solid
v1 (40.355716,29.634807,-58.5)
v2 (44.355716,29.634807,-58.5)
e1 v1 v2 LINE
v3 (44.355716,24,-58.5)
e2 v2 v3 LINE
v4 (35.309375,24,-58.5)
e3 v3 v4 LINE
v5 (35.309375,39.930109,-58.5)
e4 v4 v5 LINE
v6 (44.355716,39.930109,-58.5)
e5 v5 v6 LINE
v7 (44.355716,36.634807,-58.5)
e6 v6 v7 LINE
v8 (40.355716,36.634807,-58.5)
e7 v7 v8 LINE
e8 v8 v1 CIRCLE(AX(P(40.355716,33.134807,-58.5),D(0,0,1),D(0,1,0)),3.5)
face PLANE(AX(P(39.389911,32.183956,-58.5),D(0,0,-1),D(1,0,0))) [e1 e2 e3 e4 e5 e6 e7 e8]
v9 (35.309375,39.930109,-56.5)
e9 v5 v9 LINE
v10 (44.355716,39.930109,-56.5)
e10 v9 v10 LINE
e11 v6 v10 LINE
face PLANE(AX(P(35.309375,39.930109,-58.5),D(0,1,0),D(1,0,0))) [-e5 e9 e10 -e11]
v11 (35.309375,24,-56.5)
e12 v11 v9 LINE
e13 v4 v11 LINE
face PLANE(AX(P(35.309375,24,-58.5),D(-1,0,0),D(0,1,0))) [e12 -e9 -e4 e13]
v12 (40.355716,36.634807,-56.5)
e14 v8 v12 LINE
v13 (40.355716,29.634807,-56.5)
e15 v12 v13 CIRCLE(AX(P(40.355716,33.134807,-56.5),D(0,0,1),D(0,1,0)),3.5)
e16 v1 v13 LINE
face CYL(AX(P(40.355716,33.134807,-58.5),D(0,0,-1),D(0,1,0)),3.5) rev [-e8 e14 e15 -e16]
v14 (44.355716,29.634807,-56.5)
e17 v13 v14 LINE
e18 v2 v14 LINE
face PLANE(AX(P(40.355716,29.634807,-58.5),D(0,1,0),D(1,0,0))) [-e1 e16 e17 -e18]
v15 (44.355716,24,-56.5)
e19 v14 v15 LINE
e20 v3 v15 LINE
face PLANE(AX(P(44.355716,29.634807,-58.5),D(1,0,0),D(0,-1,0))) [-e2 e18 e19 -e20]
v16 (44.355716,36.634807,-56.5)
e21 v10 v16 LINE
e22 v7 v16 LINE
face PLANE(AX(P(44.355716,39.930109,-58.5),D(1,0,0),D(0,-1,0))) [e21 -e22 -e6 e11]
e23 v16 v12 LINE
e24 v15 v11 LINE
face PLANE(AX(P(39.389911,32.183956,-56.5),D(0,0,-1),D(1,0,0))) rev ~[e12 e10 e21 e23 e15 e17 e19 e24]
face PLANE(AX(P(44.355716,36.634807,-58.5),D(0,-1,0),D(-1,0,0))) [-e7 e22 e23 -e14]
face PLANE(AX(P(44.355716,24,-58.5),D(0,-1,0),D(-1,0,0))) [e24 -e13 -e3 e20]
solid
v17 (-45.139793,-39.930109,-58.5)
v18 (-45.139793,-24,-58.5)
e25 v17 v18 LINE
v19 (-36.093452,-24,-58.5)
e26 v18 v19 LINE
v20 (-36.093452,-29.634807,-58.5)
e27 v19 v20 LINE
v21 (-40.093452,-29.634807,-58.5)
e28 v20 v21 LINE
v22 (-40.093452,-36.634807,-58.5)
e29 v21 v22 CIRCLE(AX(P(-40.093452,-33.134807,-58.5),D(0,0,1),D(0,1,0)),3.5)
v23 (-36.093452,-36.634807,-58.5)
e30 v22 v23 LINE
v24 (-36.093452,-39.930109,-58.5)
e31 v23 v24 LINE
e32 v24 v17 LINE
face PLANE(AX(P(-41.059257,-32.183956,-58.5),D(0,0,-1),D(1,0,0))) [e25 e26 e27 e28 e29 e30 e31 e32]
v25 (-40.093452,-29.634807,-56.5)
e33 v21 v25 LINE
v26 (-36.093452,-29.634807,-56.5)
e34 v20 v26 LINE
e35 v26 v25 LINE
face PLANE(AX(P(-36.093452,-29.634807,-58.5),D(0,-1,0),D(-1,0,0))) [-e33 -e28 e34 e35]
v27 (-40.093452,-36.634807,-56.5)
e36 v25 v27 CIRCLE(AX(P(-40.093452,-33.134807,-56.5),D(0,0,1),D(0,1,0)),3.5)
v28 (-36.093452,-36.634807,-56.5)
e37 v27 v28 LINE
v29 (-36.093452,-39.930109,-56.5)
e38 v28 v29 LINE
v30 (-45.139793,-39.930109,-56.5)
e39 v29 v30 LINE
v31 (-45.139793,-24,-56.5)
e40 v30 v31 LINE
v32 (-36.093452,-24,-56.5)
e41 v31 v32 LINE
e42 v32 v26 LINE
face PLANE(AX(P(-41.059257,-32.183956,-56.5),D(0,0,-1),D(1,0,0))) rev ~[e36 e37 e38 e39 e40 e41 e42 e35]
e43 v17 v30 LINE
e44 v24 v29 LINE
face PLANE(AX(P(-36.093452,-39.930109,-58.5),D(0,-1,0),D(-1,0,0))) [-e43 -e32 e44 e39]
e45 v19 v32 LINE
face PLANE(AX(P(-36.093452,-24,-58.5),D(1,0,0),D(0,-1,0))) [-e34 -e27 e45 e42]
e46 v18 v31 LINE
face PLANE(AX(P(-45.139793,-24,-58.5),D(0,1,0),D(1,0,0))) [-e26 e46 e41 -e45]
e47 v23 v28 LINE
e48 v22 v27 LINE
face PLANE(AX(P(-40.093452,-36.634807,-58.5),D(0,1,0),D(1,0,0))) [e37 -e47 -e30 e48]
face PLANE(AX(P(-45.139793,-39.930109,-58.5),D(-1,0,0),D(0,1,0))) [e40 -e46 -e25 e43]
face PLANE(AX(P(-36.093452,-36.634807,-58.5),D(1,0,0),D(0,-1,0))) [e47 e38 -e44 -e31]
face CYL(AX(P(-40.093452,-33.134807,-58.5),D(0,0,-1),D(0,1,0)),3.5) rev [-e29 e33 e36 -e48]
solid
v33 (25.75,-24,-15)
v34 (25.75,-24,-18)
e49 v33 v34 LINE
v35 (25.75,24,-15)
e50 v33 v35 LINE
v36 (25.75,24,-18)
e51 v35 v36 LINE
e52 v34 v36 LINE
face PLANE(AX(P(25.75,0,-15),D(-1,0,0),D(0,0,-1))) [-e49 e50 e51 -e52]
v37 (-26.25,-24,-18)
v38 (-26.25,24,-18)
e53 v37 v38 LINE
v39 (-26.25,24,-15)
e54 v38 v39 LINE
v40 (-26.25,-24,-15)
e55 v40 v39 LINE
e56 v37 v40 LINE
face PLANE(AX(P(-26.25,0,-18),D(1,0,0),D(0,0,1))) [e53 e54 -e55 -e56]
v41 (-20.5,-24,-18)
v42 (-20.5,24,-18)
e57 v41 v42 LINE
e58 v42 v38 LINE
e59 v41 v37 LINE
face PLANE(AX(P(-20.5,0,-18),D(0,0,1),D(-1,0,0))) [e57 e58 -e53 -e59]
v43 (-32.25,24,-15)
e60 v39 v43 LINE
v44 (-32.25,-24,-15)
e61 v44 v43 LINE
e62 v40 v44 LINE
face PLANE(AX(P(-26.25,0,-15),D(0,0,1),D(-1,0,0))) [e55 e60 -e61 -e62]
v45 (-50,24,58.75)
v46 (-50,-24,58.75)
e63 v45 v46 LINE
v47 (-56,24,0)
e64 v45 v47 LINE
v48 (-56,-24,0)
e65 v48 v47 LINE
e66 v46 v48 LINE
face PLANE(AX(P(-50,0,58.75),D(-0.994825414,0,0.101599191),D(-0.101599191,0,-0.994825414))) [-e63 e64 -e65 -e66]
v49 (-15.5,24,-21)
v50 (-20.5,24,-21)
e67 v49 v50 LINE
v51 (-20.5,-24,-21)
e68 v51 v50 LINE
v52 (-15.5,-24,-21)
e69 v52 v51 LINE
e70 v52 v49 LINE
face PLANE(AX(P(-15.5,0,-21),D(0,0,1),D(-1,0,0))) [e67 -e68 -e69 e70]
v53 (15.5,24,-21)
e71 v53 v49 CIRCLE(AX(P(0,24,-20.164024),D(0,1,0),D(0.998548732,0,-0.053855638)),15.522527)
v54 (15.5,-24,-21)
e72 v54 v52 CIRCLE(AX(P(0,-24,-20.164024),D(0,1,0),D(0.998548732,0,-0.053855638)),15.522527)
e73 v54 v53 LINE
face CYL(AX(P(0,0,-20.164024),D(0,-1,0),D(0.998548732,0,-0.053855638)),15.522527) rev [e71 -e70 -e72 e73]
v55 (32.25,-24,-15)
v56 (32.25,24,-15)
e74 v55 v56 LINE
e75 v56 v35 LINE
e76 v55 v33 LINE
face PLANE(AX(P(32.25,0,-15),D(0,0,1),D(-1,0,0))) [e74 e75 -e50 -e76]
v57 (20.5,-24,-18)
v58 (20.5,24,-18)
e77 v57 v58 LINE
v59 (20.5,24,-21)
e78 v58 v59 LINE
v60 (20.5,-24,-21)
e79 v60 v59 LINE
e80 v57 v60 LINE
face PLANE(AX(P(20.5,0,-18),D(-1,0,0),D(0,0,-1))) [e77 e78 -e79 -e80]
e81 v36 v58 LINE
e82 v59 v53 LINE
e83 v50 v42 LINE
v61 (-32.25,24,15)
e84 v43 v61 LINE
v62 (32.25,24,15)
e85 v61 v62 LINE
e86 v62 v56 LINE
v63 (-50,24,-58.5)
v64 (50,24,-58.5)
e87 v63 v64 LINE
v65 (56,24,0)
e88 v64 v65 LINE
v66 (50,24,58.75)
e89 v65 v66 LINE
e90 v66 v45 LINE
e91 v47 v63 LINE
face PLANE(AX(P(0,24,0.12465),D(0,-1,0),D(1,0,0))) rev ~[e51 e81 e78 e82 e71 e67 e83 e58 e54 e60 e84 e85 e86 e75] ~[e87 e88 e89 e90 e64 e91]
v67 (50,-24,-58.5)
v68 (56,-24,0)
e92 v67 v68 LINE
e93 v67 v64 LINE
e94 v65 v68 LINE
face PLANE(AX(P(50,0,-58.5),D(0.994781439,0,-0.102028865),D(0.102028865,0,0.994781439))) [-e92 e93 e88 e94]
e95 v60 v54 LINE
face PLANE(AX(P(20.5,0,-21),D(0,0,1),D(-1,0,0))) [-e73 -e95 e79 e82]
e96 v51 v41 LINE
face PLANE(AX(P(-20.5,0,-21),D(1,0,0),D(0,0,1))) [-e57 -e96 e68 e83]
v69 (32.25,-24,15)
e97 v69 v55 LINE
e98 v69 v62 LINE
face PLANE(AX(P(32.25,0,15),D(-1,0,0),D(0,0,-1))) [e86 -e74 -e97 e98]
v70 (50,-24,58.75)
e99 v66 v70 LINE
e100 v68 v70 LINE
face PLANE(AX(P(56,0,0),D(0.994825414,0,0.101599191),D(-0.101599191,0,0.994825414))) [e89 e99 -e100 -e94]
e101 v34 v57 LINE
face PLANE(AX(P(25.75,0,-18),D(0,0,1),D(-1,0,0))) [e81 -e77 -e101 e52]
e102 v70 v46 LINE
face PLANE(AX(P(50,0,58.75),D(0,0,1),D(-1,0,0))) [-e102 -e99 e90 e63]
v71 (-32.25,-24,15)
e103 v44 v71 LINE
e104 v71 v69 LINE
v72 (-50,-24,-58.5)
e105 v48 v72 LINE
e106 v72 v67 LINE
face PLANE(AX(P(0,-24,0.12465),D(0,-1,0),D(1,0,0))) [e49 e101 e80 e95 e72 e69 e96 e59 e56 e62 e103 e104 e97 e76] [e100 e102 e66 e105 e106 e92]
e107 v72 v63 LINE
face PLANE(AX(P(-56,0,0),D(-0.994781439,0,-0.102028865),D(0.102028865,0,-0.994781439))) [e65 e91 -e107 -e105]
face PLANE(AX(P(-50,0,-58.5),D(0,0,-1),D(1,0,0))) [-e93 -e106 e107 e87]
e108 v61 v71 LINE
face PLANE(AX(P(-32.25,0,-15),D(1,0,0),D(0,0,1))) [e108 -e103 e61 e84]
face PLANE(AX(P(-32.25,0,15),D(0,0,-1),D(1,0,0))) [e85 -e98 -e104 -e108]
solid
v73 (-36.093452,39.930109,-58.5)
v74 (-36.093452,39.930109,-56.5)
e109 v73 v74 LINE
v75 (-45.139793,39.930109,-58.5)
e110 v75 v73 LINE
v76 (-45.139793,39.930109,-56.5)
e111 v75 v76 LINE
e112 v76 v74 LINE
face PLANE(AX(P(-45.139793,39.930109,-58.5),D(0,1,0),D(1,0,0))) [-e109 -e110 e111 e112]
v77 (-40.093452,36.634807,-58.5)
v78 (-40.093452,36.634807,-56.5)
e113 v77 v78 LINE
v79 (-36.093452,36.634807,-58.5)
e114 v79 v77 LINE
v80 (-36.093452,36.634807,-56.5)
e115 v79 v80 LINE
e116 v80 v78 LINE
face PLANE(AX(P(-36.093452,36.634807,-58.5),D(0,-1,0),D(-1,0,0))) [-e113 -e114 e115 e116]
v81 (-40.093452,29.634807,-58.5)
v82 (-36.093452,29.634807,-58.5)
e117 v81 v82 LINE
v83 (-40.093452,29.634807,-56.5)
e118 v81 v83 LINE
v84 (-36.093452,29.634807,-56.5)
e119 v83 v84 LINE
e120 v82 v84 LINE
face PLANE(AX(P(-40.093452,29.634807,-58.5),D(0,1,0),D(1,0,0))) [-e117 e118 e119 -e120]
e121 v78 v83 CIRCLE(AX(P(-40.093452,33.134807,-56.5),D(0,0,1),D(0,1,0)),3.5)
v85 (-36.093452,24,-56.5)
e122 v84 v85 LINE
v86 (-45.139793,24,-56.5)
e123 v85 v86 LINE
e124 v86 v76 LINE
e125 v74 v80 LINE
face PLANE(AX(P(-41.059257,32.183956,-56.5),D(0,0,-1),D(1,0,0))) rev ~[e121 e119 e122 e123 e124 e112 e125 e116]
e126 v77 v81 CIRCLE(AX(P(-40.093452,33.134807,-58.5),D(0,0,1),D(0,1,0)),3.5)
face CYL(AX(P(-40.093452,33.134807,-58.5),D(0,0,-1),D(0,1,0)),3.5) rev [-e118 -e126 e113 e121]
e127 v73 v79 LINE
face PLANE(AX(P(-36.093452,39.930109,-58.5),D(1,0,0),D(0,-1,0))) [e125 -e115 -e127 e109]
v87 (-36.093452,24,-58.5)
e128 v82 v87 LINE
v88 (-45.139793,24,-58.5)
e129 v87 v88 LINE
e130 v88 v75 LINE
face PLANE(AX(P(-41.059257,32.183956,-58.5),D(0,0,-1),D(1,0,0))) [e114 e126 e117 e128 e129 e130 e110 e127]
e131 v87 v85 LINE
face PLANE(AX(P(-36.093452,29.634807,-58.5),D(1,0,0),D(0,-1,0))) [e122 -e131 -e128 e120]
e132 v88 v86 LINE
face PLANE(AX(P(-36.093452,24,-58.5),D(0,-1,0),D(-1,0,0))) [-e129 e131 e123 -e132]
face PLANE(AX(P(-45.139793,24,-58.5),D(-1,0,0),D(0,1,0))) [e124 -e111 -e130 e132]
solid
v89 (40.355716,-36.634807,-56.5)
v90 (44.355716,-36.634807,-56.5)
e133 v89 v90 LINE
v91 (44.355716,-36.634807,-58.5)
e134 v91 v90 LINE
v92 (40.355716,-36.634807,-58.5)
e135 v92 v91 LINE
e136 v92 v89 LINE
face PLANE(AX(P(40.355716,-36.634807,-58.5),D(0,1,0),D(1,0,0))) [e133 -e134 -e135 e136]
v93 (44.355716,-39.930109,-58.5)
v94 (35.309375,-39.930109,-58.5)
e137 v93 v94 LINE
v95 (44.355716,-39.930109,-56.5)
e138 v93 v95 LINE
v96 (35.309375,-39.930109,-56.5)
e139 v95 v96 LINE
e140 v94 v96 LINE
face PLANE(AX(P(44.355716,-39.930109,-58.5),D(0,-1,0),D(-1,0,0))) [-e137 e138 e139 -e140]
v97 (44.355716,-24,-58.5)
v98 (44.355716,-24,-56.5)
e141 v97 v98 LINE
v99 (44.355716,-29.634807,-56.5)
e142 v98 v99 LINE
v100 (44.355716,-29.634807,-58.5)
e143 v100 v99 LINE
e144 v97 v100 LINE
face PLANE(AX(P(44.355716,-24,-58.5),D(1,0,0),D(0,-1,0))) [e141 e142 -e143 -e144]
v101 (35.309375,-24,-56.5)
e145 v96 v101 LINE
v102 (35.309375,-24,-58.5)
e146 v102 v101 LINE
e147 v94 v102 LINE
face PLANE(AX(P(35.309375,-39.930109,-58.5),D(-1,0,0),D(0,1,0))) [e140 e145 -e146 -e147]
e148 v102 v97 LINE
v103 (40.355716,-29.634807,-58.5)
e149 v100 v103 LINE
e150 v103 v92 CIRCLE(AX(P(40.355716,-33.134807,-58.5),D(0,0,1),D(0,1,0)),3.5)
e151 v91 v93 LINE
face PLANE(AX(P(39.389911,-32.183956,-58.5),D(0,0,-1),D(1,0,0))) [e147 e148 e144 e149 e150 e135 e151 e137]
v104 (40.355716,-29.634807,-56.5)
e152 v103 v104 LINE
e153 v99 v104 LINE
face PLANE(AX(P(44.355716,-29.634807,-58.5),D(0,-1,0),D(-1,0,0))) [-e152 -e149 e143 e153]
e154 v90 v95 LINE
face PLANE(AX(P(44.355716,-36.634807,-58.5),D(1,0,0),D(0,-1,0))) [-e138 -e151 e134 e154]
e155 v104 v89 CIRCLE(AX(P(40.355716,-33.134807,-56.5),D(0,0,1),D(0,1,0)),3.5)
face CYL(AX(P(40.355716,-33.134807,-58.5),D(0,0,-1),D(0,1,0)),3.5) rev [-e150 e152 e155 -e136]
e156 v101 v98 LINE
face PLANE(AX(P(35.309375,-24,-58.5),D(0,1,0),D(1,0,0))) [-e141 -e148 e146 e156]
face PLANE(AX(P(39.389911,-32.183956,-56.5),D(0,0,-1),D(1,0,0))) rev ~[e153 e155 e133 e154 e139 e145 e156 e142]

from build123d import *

# Parameters (mm, degrees)
F1_DEPTH = 24
F3_DEPTH = 2
F4_DEPTH = 24
F5_DEPTH = 5


# Not quite as in the source:
# - a feature names something its author has since deleted; it is built from what else it names


with BuildPart() as f1:
    # F0 (on Front) → F1 (new body, symmetric)
    with BuildSketch(Plane.XZ):
        Polygon((-40, -58.5), (0, -58.5), (40, -58.5), (50, -58.5), (56, 0), (50, 58.75), (0, 58.75), (-50, 58.75), (-56, 0), (-50, -58.5), align=None)
        with BuildLine():
            Line((-32.25, 15), (0, 15))
            Line((0, 15), (32.25, 15))
            Line((32.25, 15), (32.25, -15))
            Line((32.25, -15), (25.75, -15))
            Line((25.75, -15), (25.75, -18))
            Line((25.75, -18), (20.5, -18))
            Line((20.5, -18), (20.5, -21))
            Line((20.5, -21), (15.5, -21))
            ThreePointArc((15.5, -21), (0, -35.6865517328), (-15.5, -21))
            Line((-15.5, -21), (-20.5, -21))
            Line((-20.5, -21), (-20.5, -18))
            Line((-20.5, -18), (-26.25, -18))
            Line((-26.25, -18), (-26.25, -15))
            Line((-26.25, -15), (-32.25, -15))
            Line((-32.25, -15), (-32.25, 15))
        make_face(mode=Mode.SUBTRACT)
    extrude(amount=F1_DEPTH, both=True)

    # F0 (on Front) → F4 (cut, symmetric)
    with BuildSketch(Plane.XZ):
        with BuildLine():
            Line((32.25, 15), (0, 15))
            Line((0, 15), (-32.25, 15))
            Line((-32.25, 15), (-32.25, -15))
            Line((-32.25, -15), (-26.25, -15))
            Line((-26.25, -15), (-26.25, -18))
            Line((-26.25, -18), (-20.5, -18))
            Line((-20.5, -18), (-20.5, -21))
            Line((-20.5, -21), (-15.5, -21))
            ThreePointArc((-15.5, -21), (0, -35.6865517328), (15.5, -21))
            Line((15.5, -21), (20.5, -21))
            Line((20.5, -21), (20.5, -18))
            Line((20.5, -18), (25.75, -18))
            Line((25.75, -18), (25.75, -15))
            Line((25.75, -15), (32.25, -15))
            Line((32.25, -15), (32.25, 15))
        make_face()
    extrude(amount=F4_DEPTH, both=True, mode=Mode.SUBTRACT)

    # F2 (on face) → F5 (cut)
    with BuildSketch(Plane(origin=(0, 0, -58.5), x_dir=(1, 0, 0), z_dir=(0, 0, -1))):
        with BuildLine():
            Line((-40.0934517384, -33.1348065302), (-40.0934517384, -29.6348065302))
            ThreePointArc((-40.0934517384, -29.6348065302), (-43.5934517384, -33.1348065302), (-40.0934517384, -36.6348065302))
            Line((-40.0934517384, -36.6348065302), (-40.0934517384, -33.1348065302))
        make_face()
        with BuildLine():
            ThreePointArc((-36.5934517384, -33.1348065302), (-37.6185780042, -30.659932796), (-40.0934517384, -29.6348065302))
            Line((-40.0934517384, -29.6348065302), (-40.0934517384, -33.1348065302))
            Line((-40.0934517384, -33.1348065302), (-40.0934517384, -36.6348065302))
            ThreePointArc((-40.0934517384, -36.6348065302), (-37.6185780042, -35.6096802643), (-36.5934517384, -33.1348065302))
        make_face()
        with BuildLine():
            Line((-36.0934517384, -36.6348065302), (-36.0934517384, -29.6348065302))
            Line((-36.0934517384, -29.6348065302), (-40.0934517384, -29.6348065302))
            ThreePointArc((-40.0934517384, -29.6348065302), (-37.6185780042, -30.659932796), (-36.5934517384, -33.1348065302))
            ThreePointArc((-36.5934517384, -33.1348065302), (-37.6185780042, -35.6096802643), (-40.0934517384, -36.6348065302))
            Line((-40.0934517384, -36.6348065302), (-36.0934517384, -36.6348065302))
        make_face()
        with BuildLine():
            ThreePointArc((-40.0934517384, 36.6348065302), (-43.5934517384, 33.1348065302), (-40.0934517384, 29.6348065302))
            Line((-40.0934517384, 29.6348065302), (-40.0934517384, 33.1348065302))
            Line((-40.0934517384, 33.1348065302), (-40.0934517384, 36.6348065302))
        make_face()
        with BuildLine():
            Line((-40.0934517384, 33.1348065302), (-40.0934517384, 29.6348065302))
            ThreePointArc((-40.0934517384, 29.6348065302), (-37.6185780042, 30.659932796), (-36.5934517384, 33.1348065302))
            ThreePointArc((-36.5934517384, 33.1348065302), (-37.6185780042, 35.6096802643), (-40.0934517384, 36.6348065302))
            Line((-40.0934517384, 36.6348065302), (-40.0934517384, 33.1348065302))
        make_face()
        with BuildLine():
            Line((-40.0934517384, 29.6348065302), (-36.0934517384, 29.6348065302))
            Line((-36.0934517384, 29.6348065302), (-36.0934517384, 36.6348065302))
            Line((-36.0934517384, 36.6348065302), (-40.0934517384, 36.6348065302))
            ThreePointArc((-40.0934517384, 36.6348065302), (-37.6185780042, 35.6096802643), (-36.5934517384, 33.1348065302))
            ThreePointArc((-36.5934517384, 33.1348065302), (-37.6185780042, 30.659932796), (-40.0934517384, 29.6348065302))
        make_face()
        with BuildLine():
            Line((40.3557159007, -36.6348065302), (44.3557159007, -36.6348065302))
            Line((44.3557159007, -36.6348065302), (44.3557159007, -29.6348065302))
            Line((44.3557159007, -29.6348065302), (40.3557159007, -29.6348065302))
            ThreePointArc((40.3557159007, -29.6348065302), (42.8305896348, -30.659932796), (43.8557159007, -33.1348065302))
            ThreePointArc((43.8557159007, -33.1348065302), (42.8305896348, -35.6096802643), (40.3557159007, -36.6348065302))
        make_face()
        with BuildLine():
            Line((40.3557159007, -33.1348065302), (40.3557159007, -36.6348065302))
            ThreePointArc((40.3557159007, -36.6348065302), (42.8305896348, -35.6096802643), (43.8557159007, -33.1348065302))
            ThreePointArc((43.8557159007, -33.1348065302), (42.8305896348, -30.659932796), (40.3557159007, -29.6348065302))
            Line((40.3557159007, -29.6348065302), (40.3557159007, -33.1348065302))
        make_face()
        with BuildLine():
            ThreePointArc((40.3557159007, -29.6348065302), (36.8557159007, -33.1348065302), (40.3557159007, -36.6348065302))
            Line((40.3557159007, -36.6348065302), (40.3557159007, -33.1348065302))
            Line((40.3557159007, -33.1348065302), (40.3557159007, -29.6348065302))
        make_face()
        with BuildLine():
            ThreePointArc((40.3557159007, 36.6348065302), (36.8557159007, 33.1348065302), (40.3557159007, 29.6348065302))
            Line((40.3557159007, 29.6348065302), (40.3557159007, 33.1348065302))
            Line((40.3557159007, 33.1348065302), (40.3557159007, 36.6348065302))
        make_face()
        with BuildLine():
            Line((40.3557159007, 33.1348065302), (40.3557159007, 29.6348065302))
            ThreePointArc((40.3557159007, 29.6348065302), (42.8305896348, 30.659932796), (43.8557159007, 33.1348065302))
            ThreePointArc((43.8557159007, 33.1348065302), (42.8305896348, 35.6096802643), (40.3557159007, 36.6348065302))
            Line((40.3557159007, 36.6348065302), (40.3557159007, 33.1348065302))
        make_face()
        with BuildLine():
            Line((40.3557159007, 29.6348065302), (44.3557159007, 29.6348065302))
            Line((44.3557159007, 29.6348065302), (44.3557159007, 36.6348065302))
            Line((44.3557159007, 36.6348065302), (40.3557159007, 36.6348065302))
            ThreePointArc((40.3557159007, 36.6348065302), (42.8305896348, 35.6096802643), (43.8557159007, 33.1348065302))
            ThreePointArc((43.8557159007, 33.1348065302), (42.8305896348, 30.659932796), (40.3557159007, 29.6348065302))
        make_face()
    extrude(amount=-F5_DEPTH, mode=Mode.SUBTRACT)


with BuildPart() as f3:
    # F2 (on face) → F3 (new body)
    with BuildSketch(Plane(origin=(0, 0, -58.5), x_dir=(1, 0, 0), z_dir=(0, 0, -1))):
        with BuildLine():
            Line((-45.1397926509, 39.9301091), (-45.1397926509, 24))
            Line((-45.1397926509, 24), (-36.0934517384, 24))
            Line((-36.0934517384, 24), (-36.0934517384, 29.6348065302))
            Line((-36.0934517384, 29.6348065302), (-40.0934517384, 29.6348065302))
            ThreePointArc((-40.0934517384, 29.6348065302), (-43.5934517384, 33.1348065302), (-40.0934517384, 36.6348065302))
            Line((-40.0934517384, 36.6348065302), (-36.0934517384, 36.6348065302))
            Line((-36.0934517384, 36.6348065302), (-36.0934517384, 39.9301091))
            Line((-36.0934517384, 39.9301091), (-45.1397926509, 39.9301091))
        make_face()
    extrude(amount=-F3_DEPTH)


with BuildPart() as f3b:
    # F2 (on face) → F3, piece 2 (new body)
    with BuildSketch(Plane(origin=(0, 0, -58.5), x_dir=(1, 0, 0), z_dir=(0, 0, -1))):
        with BuildLine():
            Line((35.3093749881, -39.9301091), (44.3557159007, -39.9301091))
            Line((44.3557159007, -39.9301091), (44.3557159007, -36.6348065302))
            Line((44.3557159007, -36.6348065302), (40.3557159007, -36.6348065302))
            ThreePointArc((40.3557159007, -36.6348065302), (36.8557159007, -33.1348065302), (40.3557159007, -29.6348065302))
            Line((40.3557159007, -29.6348065302), (44.3557159007, -29.6348065302))
            Line((44.3557159007, -29.6348065302), (44.3557159007, -24))
            Line((44.3557159007, -24), (35.3093749881, -24))
            Line((35.3093749881, -24), (35.3093749881, -39.9301091))
        make_face()
    extrude(amount=-F3_DEPTH)


with BuildPart() as f3c:
    # F2 (on face) → F3, piece 3 (new body)
    with BuildSketch(Plane(origin=(0, 0, -58.5), x_dir=(1, 0, 0), z_dir=(0, 0, -1))):
        with BuildLine():
            Line((-36.0934517384, -29.6348065302), (-36.0934517384, -24))
            Line((-36.0934517384, -24), (-45.1397926509, -24))
            Line((-45.1397926509, -24), (-45.1397926509, -39.9301091))
            Line((-45.1397926509, -39.9301091), (-36.0934517384, -39.9301091))
            Line((-36.0934517384, -39.9301091), (-36.0934517384, -36.6348065302))
            Line((-36.0934517384, -36.6348065302), (-40.0934517384, -36.6348065302))
            ThreePointArc((-40.0934517384, -36.6348065302), (-43.5934517384, -33.1348065302), (-40.0934517384, -29.6348065302))
            Line((-40.0934517384, -29.6348065302), (-36.0934517384, -29.6348065302))
        make_face()
    extrude(amount=-F3_DEPTH)


with BuildPart() as f3d:
    # F2 (on face) → F3, piece 4 (new body)
    with BuildSketch(Plane(origin=(0, 0, -58.5), x_dir=(1, 0, 0), z_dir=(0, 0, -1))):
        with BuildLine():
            Line((35.3093749881, 24), (44.3557159007, 24))
            Line((44.3557159007, 24), (44.3557159007, 29.6348065302))
            Line((44.3557159007, 29.6348065302), (40.3557159007, 29.6348065302))
            ThreePointArc((40.3557159007, 29.6348065302), (36.8557159007, 33.1348065302), (40.3557159007, 36.6348065302))
            Line((40.3557159007, 36.6348065302), (44.3557159007, 36.6348065302))
            Line((44.3557159007, 36.6348065302), (44.3557159007, 39.9301091))
            Line((44.3557159007, 39.9301091), (35.3093749881, 39.9301091))
            Line((35.3093749881, 39.9301091), (35.3093749881, 24))
        make_face()
    extrude(amount=-F3_DEPTH)


solid = Compound([f1.part, f3.part, f3b.part, f3c.part, f3d.part])
